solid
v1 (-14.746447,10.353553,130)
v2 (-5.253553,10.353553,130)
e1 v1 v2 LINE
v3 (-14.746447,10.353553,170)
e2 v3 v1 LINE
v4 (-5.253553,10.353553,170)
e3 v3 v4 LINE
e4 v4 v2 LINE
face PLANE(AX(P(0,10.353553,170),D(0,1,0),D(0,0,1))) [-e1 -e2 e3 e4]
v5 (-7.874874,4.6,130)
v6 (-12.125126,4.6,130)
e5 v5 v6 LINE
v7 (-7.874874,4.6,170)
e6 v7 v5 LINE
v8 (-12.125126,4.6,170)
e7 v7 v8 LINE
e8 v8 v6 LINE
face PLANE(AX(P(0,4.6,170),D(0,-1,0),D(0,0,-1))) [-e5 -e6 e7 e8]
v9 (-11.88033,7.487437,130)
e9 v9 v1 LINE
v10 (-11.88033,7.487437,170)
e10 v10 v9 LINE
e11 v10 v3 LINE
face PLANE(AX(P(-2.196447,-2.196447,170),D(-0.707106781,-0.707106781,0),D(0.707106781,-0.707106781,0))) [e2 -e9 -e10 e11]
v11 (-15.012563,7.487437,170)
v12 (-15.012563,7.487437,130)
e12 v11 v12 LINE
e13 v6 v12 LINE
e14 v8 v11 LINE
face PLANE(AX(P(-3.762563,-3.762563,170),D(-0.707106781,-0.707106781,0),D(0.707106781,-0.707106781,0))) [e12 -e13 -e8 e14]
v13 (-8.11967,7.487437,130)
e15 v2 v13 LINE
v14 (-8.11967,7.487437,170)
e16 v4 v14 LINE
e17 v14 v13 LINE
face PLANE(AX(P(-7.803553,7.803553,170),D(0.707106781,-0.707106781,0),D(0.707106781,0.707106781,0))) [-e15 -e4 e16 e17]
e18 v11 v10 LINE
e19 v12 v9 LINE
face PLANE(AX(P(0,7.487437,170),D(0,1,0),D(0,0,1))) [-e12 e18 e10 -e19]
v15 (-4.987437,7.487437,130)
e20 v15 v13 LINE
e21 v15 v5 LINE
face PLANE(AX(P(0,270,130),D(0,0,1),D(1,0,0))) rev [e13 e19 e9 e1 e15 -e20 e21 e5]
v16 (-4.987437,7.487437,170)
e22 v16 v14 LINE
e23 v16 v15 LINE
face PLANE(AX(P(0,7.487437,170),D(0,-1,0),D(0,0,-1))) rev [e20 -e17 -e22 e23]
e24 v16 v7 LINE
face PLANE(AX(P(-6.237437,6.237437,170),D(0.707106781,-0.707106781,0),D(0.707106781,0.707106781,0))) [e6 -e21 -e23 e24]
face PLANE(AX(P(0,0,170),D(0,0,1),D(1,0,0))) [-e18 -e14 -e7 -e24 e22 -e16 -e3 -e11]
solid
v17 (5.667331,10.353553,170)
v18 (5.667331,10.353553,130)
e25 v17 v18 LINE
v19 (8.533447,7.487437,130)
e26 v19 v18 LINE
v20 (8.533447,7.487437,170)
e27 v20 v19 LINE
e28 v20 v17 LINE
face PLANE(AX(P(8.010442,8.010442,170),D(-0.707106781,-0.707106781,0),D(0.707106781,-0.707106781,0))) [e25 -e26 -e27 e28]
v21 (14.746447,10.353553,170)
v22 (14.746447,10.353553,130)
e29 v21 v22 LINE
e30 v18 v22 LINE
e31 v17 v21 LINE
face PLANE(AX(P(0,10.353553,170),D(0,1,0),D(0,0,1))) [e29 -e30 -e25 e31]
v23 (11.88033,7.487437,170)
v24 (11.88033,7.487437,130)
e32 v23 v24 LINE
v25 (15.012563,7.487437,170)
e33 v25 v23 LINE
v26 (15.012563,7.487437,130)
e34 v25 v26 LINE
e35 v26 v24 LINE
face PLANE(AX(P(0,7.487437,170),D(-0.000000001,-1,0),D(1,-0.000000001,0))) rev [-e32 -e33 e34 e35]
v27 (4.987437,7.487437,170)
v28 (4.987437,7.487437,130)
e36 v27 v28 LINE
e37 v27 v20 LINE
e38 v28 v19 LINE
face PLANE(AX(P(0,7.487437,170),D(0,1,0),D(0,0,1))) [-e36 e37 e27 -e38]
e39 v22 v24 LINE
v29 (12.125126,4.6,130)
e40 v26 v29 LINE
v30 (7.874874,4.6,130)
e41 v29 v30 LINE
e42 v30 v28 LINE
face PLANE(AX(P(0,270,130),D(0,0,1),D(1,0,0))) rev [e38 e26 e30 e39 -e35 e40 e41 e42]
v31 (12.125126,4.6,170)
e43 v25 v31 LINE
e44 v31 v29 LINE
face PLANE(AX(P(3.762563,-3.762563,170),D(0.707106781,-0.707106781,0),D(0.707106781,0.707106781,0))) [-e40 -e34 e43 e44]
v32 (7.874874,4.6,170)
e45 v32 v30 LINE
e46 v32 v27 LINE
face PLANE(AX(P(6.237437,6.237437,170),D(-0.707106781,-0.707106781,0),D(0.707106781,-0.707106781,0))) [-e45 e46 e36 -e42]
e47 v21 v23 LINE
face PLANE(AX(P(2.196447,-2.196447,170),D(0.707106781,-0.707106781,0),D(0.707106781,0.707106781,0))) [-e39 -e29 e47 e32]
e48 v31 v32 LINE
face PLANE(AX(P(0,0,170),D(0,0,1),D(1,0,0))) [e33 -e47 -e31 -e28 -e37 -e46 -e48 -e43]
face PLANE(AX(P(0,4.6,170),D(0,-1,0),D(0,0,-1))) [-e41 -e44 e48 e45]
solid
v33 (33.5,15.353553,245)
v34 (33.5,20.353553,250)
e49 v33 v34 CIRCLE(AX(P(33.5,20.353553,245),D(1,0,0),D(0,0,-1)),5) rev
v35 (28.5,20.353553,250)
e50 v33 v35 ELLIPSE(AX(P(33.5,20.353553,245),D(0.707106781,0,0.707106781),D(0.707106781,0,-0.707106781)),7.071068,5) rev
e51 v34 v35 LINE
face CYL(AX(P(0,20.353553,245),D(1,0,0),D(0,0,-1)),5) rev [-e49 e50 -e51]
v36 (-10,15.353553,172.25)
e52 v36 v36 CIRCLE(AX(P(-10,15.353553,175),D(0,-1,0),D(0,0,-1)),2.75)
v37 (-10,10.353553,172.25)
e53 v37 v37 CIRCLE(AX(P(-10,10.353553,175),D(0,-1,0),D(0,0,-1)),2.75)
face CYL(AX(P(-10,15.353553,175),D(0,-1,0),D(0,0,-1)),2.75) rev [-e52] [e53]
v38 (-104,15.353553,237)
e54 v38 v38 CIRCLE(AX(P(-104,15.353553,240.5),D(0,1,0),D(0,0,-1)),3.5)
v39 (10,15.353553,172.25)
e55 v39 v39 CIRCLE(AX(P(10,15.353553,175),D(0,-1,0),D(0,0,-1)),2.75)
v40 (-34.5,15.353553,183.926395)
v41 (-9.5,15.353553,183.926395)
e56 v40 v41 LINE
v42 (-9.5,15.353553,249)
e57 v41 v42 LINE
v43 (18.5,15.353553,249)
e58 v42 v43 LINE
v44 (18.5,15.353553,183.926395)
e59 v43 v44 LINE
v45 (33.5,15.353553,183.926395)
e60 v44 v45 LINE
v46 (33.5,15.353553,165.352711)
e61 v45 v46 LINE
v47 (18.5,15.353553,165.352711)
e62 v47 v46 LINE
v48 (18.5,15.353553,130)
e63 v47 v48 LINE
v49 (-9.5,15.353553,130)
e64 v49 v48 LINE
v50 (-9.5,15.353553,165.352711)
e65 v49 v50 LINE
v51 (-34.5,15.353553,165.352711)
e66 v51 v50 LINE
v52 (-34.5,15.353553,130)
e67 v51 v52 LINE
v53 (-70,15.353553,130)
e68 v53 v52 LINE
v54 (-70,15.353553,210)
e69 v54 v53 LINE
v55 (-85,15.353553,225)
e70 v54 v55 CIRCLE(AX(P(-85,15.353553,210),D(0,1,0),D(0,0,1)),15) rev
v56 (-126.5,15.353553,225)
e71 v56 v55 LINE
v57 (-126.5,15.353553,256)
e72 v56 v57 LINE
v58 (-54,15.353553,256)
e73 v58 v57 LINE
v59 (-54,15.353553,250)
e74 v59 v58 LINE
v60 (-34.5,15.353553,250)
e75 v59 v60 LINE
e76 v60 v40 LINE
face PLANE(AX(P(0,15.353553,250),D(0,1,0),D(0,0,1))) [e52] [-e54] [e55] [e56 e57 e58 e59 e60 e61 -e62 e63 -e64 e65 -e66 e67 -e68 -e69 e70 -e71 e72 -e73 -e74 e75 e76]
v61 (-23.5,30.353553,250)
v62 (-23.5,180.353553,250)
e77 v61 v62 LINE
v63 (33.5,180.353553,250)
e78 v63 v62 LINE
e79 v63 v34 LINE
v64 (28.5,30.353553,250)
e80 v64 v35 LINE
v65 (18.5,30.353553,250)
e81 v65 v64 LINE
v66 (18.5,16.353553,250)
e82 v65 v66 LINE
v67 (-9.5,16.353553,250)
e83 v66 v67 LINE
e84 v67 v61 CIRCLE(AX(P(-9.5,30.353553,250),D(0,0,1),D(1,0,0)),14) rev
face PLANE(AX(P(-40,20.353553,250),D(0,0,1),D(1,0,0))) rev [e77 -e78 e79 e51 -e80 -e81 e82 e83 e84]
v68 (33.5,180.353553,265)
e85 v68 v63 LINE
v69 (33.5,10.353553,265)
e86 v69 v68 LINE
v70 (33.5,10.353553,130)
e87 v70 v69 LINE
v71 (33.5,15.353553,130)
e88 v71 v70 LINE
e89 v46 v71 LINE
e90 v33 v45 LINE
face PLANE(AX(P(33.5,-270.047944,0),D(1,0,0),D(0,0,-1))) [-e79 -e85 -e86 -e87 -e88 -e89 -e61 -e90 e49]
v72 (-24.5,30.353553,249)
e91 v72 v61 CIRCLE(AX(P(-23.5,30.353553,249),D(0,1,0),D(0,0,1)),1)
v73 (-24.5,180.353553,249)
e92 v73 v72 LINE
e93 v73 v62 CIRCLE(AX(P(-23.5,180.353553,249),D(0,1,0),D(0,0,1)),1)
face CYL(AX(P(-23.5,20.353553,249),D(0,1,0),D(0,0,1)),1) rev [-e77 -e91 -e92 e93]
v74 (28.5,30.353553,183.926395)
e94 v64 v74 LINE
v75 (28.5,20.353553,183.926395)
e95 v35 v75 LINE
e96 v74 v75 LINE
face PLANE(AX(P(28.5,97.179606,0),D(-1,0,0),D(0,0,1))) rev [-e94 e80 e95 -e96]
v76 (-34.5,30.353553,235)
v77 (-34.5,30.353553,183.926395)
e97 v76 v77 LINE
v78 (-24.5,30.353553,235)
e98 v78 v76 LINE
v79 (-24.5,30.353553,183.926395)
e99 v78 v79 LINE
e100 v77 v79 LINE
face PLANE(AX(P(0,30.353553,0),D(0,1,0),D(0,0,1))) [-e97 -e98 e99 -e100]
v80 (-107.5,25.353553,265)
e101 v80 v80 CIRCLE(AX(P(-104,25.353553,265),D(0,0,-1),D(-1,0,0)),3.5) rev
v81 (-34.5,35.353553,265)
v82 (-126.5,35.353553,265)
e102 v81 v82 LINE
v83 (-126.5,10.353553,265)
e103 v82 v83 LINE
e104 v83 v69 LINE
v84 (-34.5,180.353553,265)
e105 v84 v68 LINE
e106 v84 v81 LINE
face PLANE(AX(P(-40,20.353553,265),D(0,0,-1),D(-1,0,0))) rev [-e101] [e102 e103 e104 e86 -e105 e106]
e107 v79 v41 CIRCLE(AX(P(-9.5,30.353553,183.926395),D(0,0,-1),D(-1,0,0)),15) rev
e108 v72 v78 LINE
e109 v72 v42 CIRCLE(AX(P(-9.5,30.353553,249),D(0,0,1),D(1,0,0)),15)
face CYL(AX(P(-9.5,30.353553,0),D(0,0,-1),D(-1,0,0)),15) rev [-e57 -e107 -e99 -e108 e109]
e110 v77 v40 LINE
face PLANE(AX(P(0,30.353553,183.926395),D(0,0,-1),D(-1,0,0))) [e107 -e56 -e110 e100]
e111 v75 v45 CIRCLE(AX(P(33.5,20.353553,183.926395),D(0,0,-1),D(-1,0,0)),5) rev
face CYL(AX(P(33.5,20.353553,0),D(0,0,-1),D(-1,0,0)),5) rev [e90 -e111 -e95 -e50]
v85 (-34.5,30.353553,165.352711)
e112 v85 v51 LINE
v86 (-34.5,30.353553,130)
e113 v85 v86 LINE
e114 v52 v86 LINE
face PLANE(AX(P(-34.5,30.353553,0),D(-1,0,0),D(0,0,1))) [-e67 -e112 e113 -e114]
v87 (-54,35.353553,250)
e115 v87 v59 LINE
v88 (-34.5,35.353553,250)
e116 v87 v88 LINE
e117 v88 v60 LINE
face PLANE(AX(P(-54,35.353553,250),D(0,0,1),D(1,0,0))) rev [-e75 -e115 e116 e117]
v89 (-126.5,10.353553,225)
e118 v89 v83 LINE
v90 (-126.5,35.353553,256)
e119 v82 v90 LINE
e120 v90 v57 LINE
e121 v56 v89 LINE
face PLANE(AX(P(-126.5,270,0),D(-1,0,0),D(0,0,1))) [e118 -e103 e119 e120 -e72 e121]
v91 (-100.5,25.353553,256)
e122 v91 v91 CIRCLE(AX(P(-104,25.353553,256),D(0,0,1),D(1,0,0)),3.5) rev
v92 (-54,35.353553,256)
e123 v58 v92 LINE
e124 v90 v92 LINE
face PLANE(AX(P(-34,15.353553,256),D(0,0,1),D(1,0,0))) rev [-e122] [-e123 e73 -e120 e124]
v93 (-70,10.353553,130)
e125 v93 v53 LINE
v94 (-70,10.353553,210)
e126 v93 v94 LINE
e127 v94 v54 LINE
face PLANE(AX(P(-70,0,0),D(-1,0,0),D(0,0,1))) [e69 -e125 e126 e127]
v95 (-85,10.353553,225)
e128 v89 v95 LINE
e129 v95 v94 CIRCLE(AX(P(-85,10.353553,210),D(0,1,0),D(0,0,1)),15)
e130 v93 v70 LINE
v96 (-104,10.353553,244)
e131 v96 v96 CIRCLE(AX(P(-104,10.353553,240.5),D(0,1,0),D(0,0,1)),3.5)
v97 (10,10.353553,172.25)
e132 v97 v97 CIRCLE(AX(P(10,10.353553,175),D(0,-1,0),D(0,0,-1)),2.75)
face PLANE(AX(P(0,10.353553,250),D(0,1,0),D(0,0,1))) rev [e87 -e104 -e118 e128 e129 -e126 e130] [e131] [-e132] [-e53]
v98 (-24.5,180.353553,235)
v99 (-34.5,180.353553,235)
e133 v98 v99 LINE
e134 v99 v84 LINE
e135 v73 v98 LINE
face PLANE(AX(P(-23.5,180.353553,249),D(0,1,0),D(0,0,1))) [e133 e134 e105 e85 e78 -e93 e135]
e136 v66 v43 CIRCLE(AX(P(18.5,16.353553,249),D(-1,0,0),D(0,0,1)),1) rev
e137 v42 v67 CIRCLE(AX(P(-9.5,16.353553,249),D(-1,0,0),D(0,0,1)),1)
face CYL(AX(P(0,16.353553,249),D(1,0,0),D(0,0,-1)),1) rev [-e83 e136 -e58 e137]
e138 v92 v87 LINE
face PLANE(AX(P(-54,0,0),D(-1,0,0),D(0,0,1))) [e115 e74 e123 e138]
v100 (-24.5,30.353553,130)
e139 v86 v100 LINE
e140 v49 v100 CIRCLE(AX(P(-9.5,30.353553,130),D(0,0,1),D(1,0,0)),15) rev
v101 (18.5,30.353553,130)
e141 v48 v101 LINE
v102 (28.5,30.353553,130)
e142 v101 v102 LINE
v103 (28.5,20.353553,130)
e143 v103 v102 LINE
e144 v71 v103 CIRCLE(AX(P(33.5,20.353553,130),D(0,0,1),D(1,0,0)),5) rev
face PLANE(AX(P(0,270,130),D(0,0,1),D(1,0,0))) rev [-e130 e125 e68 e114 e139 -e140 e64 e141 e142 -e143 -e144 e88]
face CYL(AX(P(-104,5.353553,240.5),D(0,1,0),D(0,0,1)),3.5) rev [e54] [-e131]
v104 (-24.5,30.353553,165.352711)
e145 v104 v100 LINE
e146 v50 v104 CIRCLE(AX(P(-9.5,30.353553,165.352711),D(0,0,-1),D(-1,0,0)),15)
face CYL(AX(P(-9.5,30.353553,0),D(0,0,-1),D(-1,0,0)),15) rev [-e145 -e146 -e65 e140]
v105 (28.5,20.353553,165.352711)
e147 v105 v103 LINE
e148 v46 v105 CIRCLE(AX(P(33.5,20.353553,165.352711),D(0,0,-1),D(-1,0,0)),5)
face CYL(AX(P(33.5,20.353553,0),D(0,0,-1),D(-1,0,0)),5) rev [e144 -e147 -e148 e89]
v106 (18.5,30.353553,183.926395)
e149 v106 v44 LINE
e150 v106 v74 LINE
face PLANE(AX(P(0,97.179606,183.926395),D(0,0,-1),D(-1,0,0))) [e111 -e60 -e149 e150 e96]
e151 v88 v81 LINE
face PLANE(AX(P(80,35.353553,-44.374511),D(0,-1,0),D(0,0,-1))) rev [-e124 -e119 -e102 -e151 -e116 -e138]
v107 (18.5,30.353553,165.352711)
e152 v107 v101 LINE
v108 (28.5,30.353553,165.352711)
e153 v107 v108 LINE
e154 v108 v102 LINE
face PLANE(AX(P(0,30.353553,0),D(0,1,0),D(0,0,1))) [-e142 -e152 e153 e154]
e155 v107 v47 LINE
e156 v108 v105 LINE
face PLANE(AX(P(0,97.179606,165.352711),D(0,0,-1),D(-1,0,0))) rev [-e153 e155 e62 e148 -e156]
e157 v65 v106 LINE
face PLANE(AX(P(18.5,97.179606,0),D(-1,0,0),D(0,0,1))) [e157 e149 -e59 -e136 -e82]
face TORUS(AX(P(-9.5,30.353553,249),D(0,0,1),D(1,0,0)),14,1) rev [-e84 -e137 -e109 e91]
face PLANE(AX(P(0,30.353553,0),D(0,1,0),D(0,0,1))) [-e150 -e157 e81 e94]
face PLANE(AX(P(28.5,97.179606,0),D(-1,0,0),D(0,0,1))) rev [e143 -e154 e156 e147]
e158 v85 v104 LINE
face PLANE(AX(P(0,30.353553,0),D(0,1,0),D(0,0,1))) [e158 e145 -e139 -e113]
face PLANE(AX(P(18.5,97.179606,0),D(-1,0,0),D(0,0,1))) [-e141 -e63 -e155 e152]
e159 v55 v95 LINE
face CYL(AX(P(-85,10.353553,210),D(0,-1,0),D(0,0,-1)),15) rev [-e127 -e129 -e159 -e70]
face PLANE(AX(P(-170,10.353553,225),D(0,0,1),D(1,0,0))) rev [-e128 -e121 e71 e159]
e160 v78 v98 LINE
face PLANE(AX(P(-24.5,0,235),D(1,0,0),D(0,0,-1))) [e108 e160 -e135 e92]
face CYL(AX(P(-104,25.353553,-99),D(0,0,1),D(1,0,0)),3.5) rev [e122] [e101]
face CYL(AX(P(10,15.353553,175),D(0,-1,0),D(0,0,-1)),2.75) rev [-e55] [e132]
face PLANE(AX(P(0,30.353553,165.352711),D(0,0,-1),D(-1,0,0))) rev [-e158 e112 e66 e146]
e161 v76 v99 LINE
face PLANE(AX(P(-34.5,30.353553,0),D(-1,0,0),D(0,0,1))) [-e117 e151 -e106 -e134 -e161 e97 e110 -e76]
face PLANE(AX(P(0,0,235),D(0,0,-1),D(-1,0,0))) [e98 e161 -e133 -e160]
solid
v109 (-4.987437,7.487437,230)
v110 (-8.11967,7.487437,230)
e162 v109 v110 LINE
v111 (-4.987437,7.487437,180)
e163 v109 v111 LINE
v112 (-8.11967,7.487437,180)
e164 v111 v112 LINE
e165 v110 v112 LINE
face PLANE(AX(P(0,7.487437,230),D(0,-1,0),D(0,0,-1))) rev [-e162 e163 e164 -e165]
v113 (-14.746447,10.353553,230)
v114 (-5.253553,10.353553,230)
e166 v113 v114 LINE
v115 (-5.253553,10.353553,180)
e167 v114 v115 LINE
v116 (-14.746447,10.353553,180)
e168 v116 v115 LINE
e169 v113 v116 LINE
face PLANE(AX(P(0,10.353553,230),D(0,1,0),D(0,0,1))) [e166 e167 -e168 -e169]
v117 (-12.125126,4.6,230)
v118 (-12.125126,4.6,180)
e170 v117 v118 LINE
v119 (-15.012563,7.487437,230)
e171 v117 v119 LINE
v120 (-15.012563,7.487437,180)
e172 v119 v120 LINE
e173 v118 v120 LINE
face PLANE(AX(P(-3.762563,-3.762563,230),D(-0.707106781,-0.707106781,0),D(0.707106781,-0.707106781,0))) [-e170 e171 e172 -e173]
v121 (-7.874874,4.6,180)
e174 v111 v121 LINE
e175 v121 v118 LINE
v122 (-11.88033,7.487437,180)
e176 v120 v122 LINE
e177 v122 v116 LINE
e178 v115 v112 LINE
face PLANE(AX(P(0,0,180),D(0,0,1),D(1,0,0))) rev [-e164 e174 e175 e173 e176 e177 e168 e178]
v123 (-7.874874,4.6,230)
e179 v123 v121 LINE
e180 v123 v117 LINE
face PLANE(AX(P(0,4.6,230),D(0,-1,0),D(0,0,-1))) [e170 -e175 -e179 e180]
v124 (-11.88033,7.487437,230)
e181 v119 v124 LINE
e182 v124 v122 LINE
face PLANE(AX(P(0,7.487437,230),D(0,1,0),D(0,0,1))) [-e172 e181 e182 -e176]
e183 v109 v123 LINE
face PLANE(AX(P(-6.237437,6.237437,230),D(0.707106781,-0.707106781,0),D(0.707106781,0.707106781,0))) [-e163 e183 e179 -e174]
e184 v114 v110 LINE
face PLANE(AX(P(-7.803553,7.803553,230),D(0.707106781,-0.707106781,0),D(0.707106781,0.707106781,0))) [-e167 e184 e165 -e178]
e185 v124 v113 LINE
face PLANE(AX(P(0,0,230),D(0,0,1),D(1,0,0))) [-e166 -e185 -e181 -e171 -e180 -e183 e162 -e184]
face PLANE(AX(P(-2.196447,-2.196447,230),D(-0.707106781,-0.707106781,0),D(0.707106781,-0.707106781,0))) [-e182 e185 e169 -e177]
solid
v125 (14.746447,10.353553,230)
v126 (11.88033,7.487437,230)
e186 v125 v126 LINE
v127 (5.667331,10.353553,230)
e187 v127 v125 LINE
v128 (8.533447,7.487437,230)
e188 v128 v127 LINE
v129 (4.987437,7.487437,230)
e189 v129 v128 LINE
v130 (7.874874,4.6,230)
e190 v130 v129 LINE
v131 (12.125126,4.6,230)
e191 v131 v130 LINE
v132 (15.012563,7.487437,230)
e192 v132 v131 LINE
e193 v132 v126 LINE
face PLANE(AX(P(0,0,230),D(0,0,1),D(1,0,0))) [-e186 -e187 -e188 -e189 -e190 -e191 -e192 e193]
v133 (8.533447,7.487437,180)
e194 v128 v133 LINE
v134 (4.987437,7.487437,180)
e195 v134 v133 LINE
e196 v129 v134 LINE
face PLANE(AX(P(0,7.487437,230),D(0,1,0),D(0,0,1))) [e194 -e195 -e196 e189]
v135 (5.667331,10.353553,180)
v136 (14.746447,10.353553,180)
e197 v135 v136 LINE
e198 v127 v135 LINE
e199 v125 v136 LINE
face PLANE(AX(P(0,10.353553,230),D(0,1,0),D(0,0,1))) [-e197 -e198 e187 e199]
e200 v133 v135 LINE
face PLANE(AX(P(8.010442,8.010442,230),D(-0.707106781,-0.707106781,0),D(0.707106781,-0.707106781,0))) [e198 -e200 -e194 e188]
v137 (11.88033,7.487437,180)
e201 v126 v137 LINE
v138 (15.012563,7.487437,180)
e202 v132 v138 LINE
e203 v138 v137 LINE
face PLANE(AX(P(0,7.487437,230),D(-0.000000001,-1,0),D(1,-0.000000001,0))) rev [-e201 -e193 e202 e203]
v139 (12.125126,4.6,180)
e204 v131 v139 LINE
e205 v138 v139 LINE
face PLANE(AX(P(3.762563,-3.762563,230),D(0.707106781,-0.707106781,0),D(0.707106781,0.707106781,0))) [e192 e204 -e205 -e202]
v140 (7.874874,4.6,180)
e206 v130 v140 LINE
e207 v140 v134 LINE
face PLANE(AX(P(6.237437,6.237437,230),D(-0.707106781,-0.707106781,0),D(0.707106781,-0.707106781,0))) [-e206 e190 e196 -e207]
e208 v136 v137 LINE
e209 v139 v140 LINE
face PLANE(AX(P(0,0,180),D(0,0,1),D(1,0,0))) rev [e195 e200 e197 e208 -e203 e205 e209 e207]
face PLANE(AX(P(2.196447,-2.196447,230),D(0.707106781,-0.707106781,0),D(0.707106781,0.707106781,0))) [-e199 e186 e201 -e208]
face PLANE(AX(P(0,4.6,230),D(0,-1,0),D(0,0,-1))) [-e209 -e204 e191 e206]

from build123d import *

# Parameters (mm, degrees)
BOSS_EXTRUDE1_DEPTH      = 250
BOSS_EXTRUDE2_DEPTH      = 50
BOSS_EXTRUDE2_2_DEPTH    = 50
LPATTERN1_COUNT          = 4
LPATTERN1_PITCH          = 60
SKETCH2_R                = 2.75
CUT_EXTRUDE1_DEPTH       = 251.864711302
UPPER_ACRYLIC_SUPP_W     = 20
UPPER_ACRYLIC_SUPP_H     = 250
BOSS_EXTRUDE3_DEPTH      = 5
UPPER_ACRYLIC_SUPP_3_W   = 10
UPPER_ACRYLIC_SUPP_3_H   = 66.073604859
UPPER_ACRYLIC_SUPP_3_H_2 = 41.475217291
UPPER_ACRYLIC_SUPP_3_H_3 = 42.557179481
UPPER_ACRYLIC_SUPP_3_H_4 = 45.558340935
BOSS_EXTRUDE4_DEPTH      = 15
FILLET1_R                = 15
SKETCH4_W                = 60
SKETCH4_H                = 15
BOSS_EXTRUDE5_DEPTH      = 5
SKETCH4_3_W              = 60
SKETCH4_3_H              = 15
BOSS_EXTRUDE6_DEPTH      = 60
SKETCH5_W                = 10
SKETCH5_H                = 45
BOSS_EXTRUDE7_DEPTH      = 15
BOSS_EXTRUDE8_START      = 250
SKETCH5_3_W              = 10
SKETCH5_3_H              = 45
BOSS_EXTRUDE8_DEPTH      = 15
FILLET2_R                = 1
SKETCH6_W                = 6
SKETCH6_H                = 60
CUT_EXTRUDE2_DEPTH       = 6
BOSS_EXTRUDE9_DEPTH      = 30
SKETCH8_W                = 333.602701612
SKETCH8_H                = 59.031331047
CUT_EXTRUDE3_DEPTH       = 150
SKETCH9_W                = 6
SKETCH9_H                = 20
CLOTH_ESCAPE_GAP_DEPTH   = 20
SKETCH11_W               = 9
SKETCH11_H               = 20
BOSS_EXTRUDE11_DEPTH     = 100
CUT_EXTRUDE4_DEPTH       = 68
SKETCH13_W               = 40
SKETCH13_H               = 5
BOSS_EXTRUDE13_DEPTH     = 100
CUT_EXTRUDE5_DEPTH       = 100
FILLET3_R                = 15
BOSS_EXTRUDE14_START     = -5
BOSS_EXTRUDE14_DEPTH     = 25
CUT_EXTRUDE6_DEPTH       = 30
CUT_EXTRUDE6_DEPTH_BACK  = 10
SKETCH16_5_W             = 8.5
SKETCH16_5_H             = 41.475217291
SKETCH16_5_H_2           = 42.557179481
SKETCH16_5_W_2           = 1.5
SKETCH16_5_H_3           = 42.177819043
SKETCH16_5_H_4           = 20.831100018
SKETCH16_5_H_5           = 17.311395043
SKETCH16_5_H_6           = 18.573684265
SKETCH16_5_H_7           = 65.073604859
SKETCH16_6_W             = 8.5
SKETCH16_6_H             = 41.475217291
SKETCH16_6_H_2           = 42.557179481
SKETCH16_6_W_2           = 1.5
SKETCH16_6_H_3           = 42.177819043
SKETCH16_6_H_4           = 20.831100018
SKETCH16_6_H_5           = 17.311395043
SKETCH16_6_H_6           = 18.573684265
SKETCH16_6_H_7           = 65.073604859
BOSS_EXTRUDE15_DEPTH     = 5
BOSS_EXTRUDE16_DEPTH     = 20
SKETCH16_8_W             = 8.5
SKETCH16_8_H             = 41.475217291
SKETCH16_8_H_2           = 42.557179481
SKETCH16_8_W_2           = 1.5
SKETCH16_8_H_3           = 42.177819043
SKETCH16_8_H_4           = 65.073604859
BOSS_EXTRUDE17_DEPTH     = 15
BOSS_EXTRUDE18_START     = -5
BOSS_EXTRUDE18_DEPTH     = 25
FILLET4_R                = 5
BOSS_EXTRUDE21_START     = 145
BOSS_EXTRUDE21_DEPTH     = 170
SKETCH19_R               = 3.5
CUT_EXTRUDE7_DEPTH       = 10
CUT_EXTRUDE8_DEPTH       = 355
CUT_EXTRUDE8_DEPTH_BACK  = 10
SKETCH20_R               = 3.5
SKETCH21_W               = 15
SKETCH21_H               = 197.501027769
CUT_EXTRUDE9_DEPTH       = 130
SKETCH22_W               = 160
SKETCH22_H               = 135
SKETCH22_H_2             = 10
CUT_EXTRUDE11_DEPTH      = 270


with BuildPart() as part:
    # profile → Boss-Extrude1 (new body)
    with BuildSketch(Plane.XY):
        Polygon((-14.746446609, 10.353553391), (-5.253553391, 10.353553391), (5.667330529, 10.353553391), (14.746446609, 10.353553391), (20, 10.353553391), (20, 15.353553391), (-20, 15.353553391), (-20, 10.353553391), align=None)
    extrude(amount=BOSS_EXTRUDE1_DEPTH)

    # Sketch2 → Cut-Extrude1 (cut, through all)
    with BuildSketch(Plane.XZ.offset(-10.353553391)):
        with Locations(Location((-10, 175, 0), (0, 0, 270))):
            Circle(SKETCH2_R)
        with Locations(Location((10, 175, 0), (0, 0, 270))):
            Circle(SKETCH2_R)
        with Locations(Location((-10, 115, 0), (0, 0, 270))):
            Circle(SKETCH2_R)
        with Locations(Location((10, 115, 0), (0, 0, 270))):
            Circle(SKETCH2_R)
        with Locations(Location((-10, 55, 0), (0, 0, 270))):
            Circle(SKETCH2_R)
        with Locations(Location((10, 55, 0), (0, 0, 270))):
            Circle(SKETCH2_R)
    extrude(amount=-CUT_EXTRUDE1_DEPTH, mode=Mode.SUBTRACT)

    # upper_acrylic_supp → Boss-Extrude3 (add)
    with BuildSketch(Plane(origin=(0, 15.353553391, 0), x_dir=(1, 0, 0), z_dir=(0, 1, 0))):
        with Locations((-30, -125)):
            Rectangle(UPPER_ACRYLIC_SUPP_W, UPPER_ACRYLIC_SUPP_H)
    extrude(amount=-BOSS_EXTRUDE3_DEPTH)

    # upper_acrylic_supp<3> → Boss-Extrude4 (add)
    with BuildSketch(Plane(origin=(0, 15.353553391, 0), x_dir=(1, 0, 0), z_dir=(0, 1, 0))):
        with Locations((-29.5, -216.963197571)):
            Rectangle(UPPER_ACRYLIC_SUPP_3_W, UPPER_ACRYLIC_SUPP_3_H)
        with Locations((-29.5, -144.615102231)):
            Rectangle(UPPER_ACRYLIC_SUPP_3_W, UPPER_ACRYLIC_SUPP_3_H_2)
        with Locations((-29.5, -85.287508801)):
            Rectangle(UPPER_ACRYLIC_SUPP_3_W, UPPER_ACRYLIC_SUPP_3_H_3)
        with Locations((-29.5, -22.779170468)):
            Rectangle(UPPER_ACRYLIC_SUPP_3_W, UPPER_ACRYLIC_SUPP_3_H_4)
    extrude(amount=BOSS_EXTRUDE4_DEPTH)

    # Fillet1
    fillet1_edges = [part.edges().sort_by_distance(p)[0] for p in [
        (-24.5, 15.353553391, 22.779170467),
        (-24.5, 15.353553391, 85.287508801),
        (-24.5, 15.353553391, 144.615102231),
        (-24.5, 15.353553391, 216.963197571),
    ]]
    fillet(fillet1_edges, radius=FILLET1_R - 0.0001)  # a hair under: the kernel refuses the full size



with BuildPart() as body_2:
    # Sketch1<3> → Boss-Extrude2 (new body)
    with BuildSketch(Plane.XY):
        Polygon((-7.253553391, 8.353553391), (-8.119669914, 7.487436867), (-5.5, 7.487436867), (-4.987436867, 7.487436867), (-5.5, 6.974873734), (-7.874873734, 4.6), (-12.125126266, 4.6), (-14.5, 6.974873734), (-15.012563133, 7.487436867), (-14.5, 7.487436867), (-11.880330086, 7.487436867), (-12.746446609, 8.353553391), (-14.746446609, 10.353553391), (-5.253553391, 10.353553391), align=None)
    boss_extrude2 = extrude(amount=BOSS_EXTRUDE2_DEPTH)


with BuildPart() as body_3:
    # Sketch1<3> → Boss-Extrude2 2 (new body)
    with BuildSketch(Plane.XY):
        Polygon((12.746446609, 8.353553391), (11.880330086, 7.487436867), (14.5, 7.487436867), (15.012563133, 7.487436867), (14.5, 6.974873734), (12.125126266, 4.6), (7.874873734, 4.6), (5.5, 6.974873734), (4.987436867, 7.487436867), (5.5, 7.487436867), (8.533447053, 7.487436867), (7.667330529, 8.353553391), (5.667330529, 10.353553391), (14.746446609, 10.353553391), align=None)
    boss_extrude2_2 = extrude(amount=BOSS_EXTRUDE2_2_DEPTH)


with BuildPart() as lpattern1_1:
    # LPattern1: pattern copy
    add(boss_extrude2.moved(Location(Vector(0, 0, 1) * (1 * LPATTERN1_PITCH))))


with BuildPart() as lpattern1_2:
    # LPattern1: pattern copy
    add(boss_extrude2.moved(Location(Vector(0, 0, 1) * (2 * LPATTERN1_PITCH))))


with BuildPart() as lpattern1_3:
    # LPattern1: pattern copy
    add(boss_extrude2.moved(Location(Vector(0, 0, 1) * (3 * LPATTERN1_PITCH))))


with BuildPart() as lpattern1_4:
    # LPattern1: pattern copy
    add(boss_extrude2_2.moved(Location(Vector(0, 0, 1) * (1 * LPATTERN1_PITCH))))


with BuildPart() as lpattern1_5:
    # LPattern1: pattern copy
    add(boss_extrude2_2.moved(Location(Vector(0, 0, 1) * (2 * LPATTERN1_PITCH))))


with BuildPart() as lpattern1_6:
    # LPattern1: pattern copy
    add(boss_extrude2_2.moved(Location(Vector(0, 0, 1) * (3 * LPATTERN1_PITCH))))


with BuildPart() as part_1:
    add(part.part)

    add(body_2.part)  # Boss-Extrude5 merges body 2

    add(body_3.part)  # Boss-Extrude5 merges body 3
    # Sketch4 → Boss-Extrude5 (add, symmetric)
    with BuildSketch(Plane(origin=(0, 15.353553391, 0), x_dir=(1, 0, 0), z_dir=(0, 1, 0))):
        with Locations((-10, -257.5)):
            Rectangle(SKETCH4_W, SKETCH4_H)
        with Locations((-10, 7.5)):
            Rectangle(SKETCH4_W, SKETCH4_H)
    extrude(amount=BOSS_EXTRUDE5_DEPTH, both=True)

    # Sketch4<3> → Boss-Extrude6 (add)
    with BuildSketch(Plane(origin=(0, 15.353553391, 0), x_dir=(1, 0, 0), z_dir=(0, 1, 0))):
        with Locations((-10, -257.5)):
            Rectangle(SKETCH4_3_W, SKETCH4_3_H)
        with Locations((-10, 7.5)):
            Rectangle(SKETCH4_3_W, SKETCH4_3_H)
    extrude(amount=BOSS_EXTRUDE6_DEPTH)

    # Sketch5 → Boss-Extrude7 (add)
    with BuildSketch(Plane(origin=(0, 0, 250), x_dir=(-1, 0, 0), z_dir=(0, 0, -1))):
        with Locations((29.5, 52.853553391)):
            Rectangle(SKETCH5_W, SKETCH5_H)
    extrude(amount=BOSS_EXTRUDE7_DEPTH)

    # Sketch5<3> → Boss-Extrude8 (add)
    with BuildSketch(Plane(origin=(0, 0, 250), x_dir=(-1, 0, 0), z_dir=(0, 0, -1)).offset(BOSS_EXTRUDE8_START)):
        with Locations((29.5, 52.853553391)):
            Rectangle(SKETCH5_3_W, SKETCH5_3_H)
    extrude(amount=-BOSS_EXTRUDE8_DEPTH)

    # Fillet2
    fillet2_edges = [part_1.edges().sort_by_distance(p)[0] for p in [
        (-24.5, 52.853503391, 250),
        (-24.5, 52.853503391, 0),
        (5.24995, 15.353553391, 250),
        (-20.106631007, 19.746922384, 250),
        (-20.106631007, 19.746922384, 0),
        (5.24995, 15.353553391, 0),
    ]]
    fillet(fillet2_edges, radius=FILLET2_R)

    # Sketch6 → Cut-Extrude2 (cut)
    with BuildSketch(Plane.ZY.offset(40)):
        with Locations((253, 45.353553391)):
            Rectangle(SKETCH6_W, SKETCH6_H)
        with Locations((-3, 45.353553391)):
            Rectangle(SKETCH6_W, SKETCH6_H)
    extrude(amount=-CUT_EXTRUDE2_DEPTH, mode=Mode.SUBTRACT)

    # Sketch7 → Boss-Extrude9 (add)
    with BuildSketch(Plane.ZY.offset(40)):
        Polygon((265, 75.353553391), (256, 75.353553391), (256, 15.353553391), (-6, 15.353553391), (-6, 75.353553391), (-15, 75.353553391), (-15, 10.353553391), (265, 10.353553391), align=None)
    extrude(amount=BOSS_EXTRUDE9_DEPTH)

    # Sketch8 → Cut-Extrude3 (cut)
    with BuildSketch(Plane.ZY.offset(70)):
        with Locations((122.426839416, 64.869218915)):
            Rectangle(SKETCH8_W, SKETCH8_H)
    extrude(amount=-CUT_EXTRUDE3_DEPTH, mode=Mode.SUBTRACT)

    # Sketch9 → cloth_escape_gap (add)
    with BuildSketch(Plane.ZY.offset(34)):
        with Locations((253, 25.353553391)):
            Rectangle(SKETCH9_W, SKETCH9_H)
        with Locations((-3, 25.353553391)):
            Rectangle(SKETCH9_W, SKETCH9_H)
    extrude(amount=CLOTH_ESCAPE_GAP_DEPTH)

    # Sketch11 → Boss-Extrude11 (add)
    with BuildSketch(Plane.ZY.offset(70)):
        with Locations((-10.5, 25.353553391)):
            Rectangle(SKETCH11_W, SKETCH11_H)
        with Locations((260.5, 25.353553391)):
            Rectangle(SKETCH11_W, SKETCH11_H)
    extrude(amount=BOSS_EXTRUDE11_DEPTH)

    # Sketch12 → Cut-Extrude4 (cut)
    with BuildSketch(Plane.XZ.offset(-10.353553391)):
        Polygon((-170, 265), (-70, 265), (-170, 260.5), align=None)
        Polygon((-70, -15), (-170, -10.5), (-170, -15), align=None)
    extrude(amount=-CUT_EXTRUDE4_DEPTH, mode=Mode.SUBTRACT)

    # Sketch13 → Boss-Extrude13 (add)
    with BuildSketch(Plane.ZY.offset(70)):
        with Locations((5, 12.853553391)):
            Rectangle(SKETCH13_W, SKETCH13_H)
        with Locations((245, 12.853553391)):
            Rectangle(SKETCH13_W, SKETCH13_H)
    extrude(amount=BOSS_EXTRUDE13_DEPTH)

    # Sketch14 → Cut-Extrude5 (cut)
    with BuildSketch(Plane(origin=(0, 15.353553391, 0), x_dir=(1, 0, 0), z_dir=(0, 1, 0))):
        Polygon((-70, -265), (-170, -260.5), (-170, -265), align=None)
        Polygon((-170, 15), (-170, 10.5), (-70, 15), align=None)
    extrude(amount=-CUT_EXTRUDE5_DEPTH, mode=Mode.SUBTRACT)

    # Fillet3
    fillet3_edges = [part_1.edges().sort_by_distance(p)[0] for p in [
        (-70, 12.853553391, 25),
        (-70, 12.853553391, 225),
    ]]
    fillet(fillet3_edges, radius=FILLET3_R)

    # Sketch16 → Boss-Extrude14 (add)
    with BuildSketch(Plane(origin=(0, 15.353553391, 0), x_dir=(1, 0, 0), z_dir=(0, 1, 0)).offset(BOSS_EXTRUDE14_START)):
        Polygon((28.5, 0), (33.5, 0), (33.5, 15), (18.5, 15), (18.5, 0), align=None)
        Polygon((18.5, -250), (18.5, -265), (33.5, -265), (33.5, -250), (28.5, -250), align=None)
    extrude(amount=BOSS_EXTRUDE14_DEPTH)

    # Sketch16<5> → Cut-Extrude6 (cut, two sides: drawn at the far end of the back side and taken through both)
    with BuildSketch(Plane(origin=(0, 15.353553391, 0), x_dir=(1, 0, 0), z_dir=(0, 1, 0)).offset(-CUT_EXTRUDE6_DEPTH_BACK)):
        Polygon((18.5, -250), (18.5, -265), (33.5, -265), (33.5, -250), (28.5, -250), align=None)
        Polygon((28.5, -250), (33.5, -250), (33.5, 0), (28.5, 0), (28.5, -43.177819043), (20, -43.177819043), (20, -64.008919061), (28.5, -64.008919061), (28.5, -106.566098542), (20, -106.566098542), (20, -123.877493585), (28.5, -123.877493585), (28.5, -165.352710876), (20, -165.352710876), (20, -183.926395141), (28.5, -183.926395141), align=None)
        with Locations((24.25, -144.615102231)):
            Rectangle(SKETCH16_5_W, SKETCH16_5_H)
        with Locations((24.25, -85.287508801)):
            Rectangle(SKETCH16_5_W, SKETCH16_5_H_2)
        Polygon((28.5, -43.177819043), (28.5, 0), (18.5, 0), (18.5, -1), (20, -1), (20, -43.177819043), align=None)
        Polygon((28.5, 0), (33.5, 0), (33.5, 15), (18.5, 15), (18.5, 0), align=None)
        with Locations((19.25, -22.088909521)):
            Rectangle(SKETCH16_5_W_2, SKETCH16_5_H_3)
        with Locations((19.25, -53.593369052)):
            Rectangle(SKETCH16_5_W_2, SKETCH16_5_H_4)
        with Locations((19.25, -85.287508801)):
            Rectangle(SKETCH16_5_W_2, SKETCH16_5_H_2)
        with Locations((19.25, -115.221796064)):
            Rectangle(SKETCH16_5_W_2, SKETCH16_5_H_5)
        with Locations((19.25, -144.615102231)):
            Rectangle(SKETCH16_5_W_2, SKETCH16_5_H)
        with Locations((19.25, -174.639553009)):
            Rectangle(SKETCH16_5_W_2, SKETCH16_5_H_6)
        with Locations((19.25, -216.463197571)):
            Rectangle(SKETCH16_5_W_2, SKETCH16_5_H_7)
        Polygon((18.5, -249), (18.5, -250), (28.5, -250), (28.5, -183.926395141), (20, -183.926395141), (20, -249), align=None)
    extrude(amount=CUT_EXTRUDE6_DEPTH + CUT_EXTRUDE6_DEPTH_BACK, mode=Mode.SUBTRACT)

    # Sketch16<6> → Boss-Extrude15 (add)
    with BuildSketch(Plane(origin=(0, 15.353553391, 0), x_dir=(1, 0, 0), z_dir=(0, 1, 0))):
        Polygon((28.5, -250), (33.5, -250), (33.5, 0), (28.5, 0), (28.5, -43.177819043), (20, -43.177819043), (20, -64.008919061), (28.5, -64.008919061), (28.5, -106.566098542), (20, -106.566098542), (20, -123.877493585), (28.5, -123.877493585), (28.5, -165.352710876), (20, -165.352710876), (20, -183.926395141), (28.5, -183.926395141), align=None)
        Polygon((18.5, -249), (18.5, -250), (28.5, -250), (28.5, -183.926395141), (20, -183.926395141), (20, -249), align=None)
        Polygon((18.5, -250), (18.5, -265), (33.5, -265), (33.5, -250), (28.5, -250), align=None)
        with Locations((24.25, -144.615102231)):
            Rectangle(SKETCH16_6_W, SKETCH16_6_H)
        with Locations((24.25, -85.287508801)):
            Rectangle(SKETCH16_6_W, SKETCH16_6_H_2)
        Polygon((28.5, -43.177819043), (28.5, 0), (18.5, 0), (18.5, -1), (20, -1), (20, -43.177819043), align=None)
        Polygon((28.5, 0), (33.5, 0), (33.5, 15), (18.5, 15), (18.5, 0), align=None)
        with Locations((19.25, -22.088909521)):
            Rectangle(SKETCH16_6_W_2, SKETCH16_6_H_3)
        with Locations((19.25, -53.593369052)):
            Rectangle(SKETCH16_6_W_2, SKETCH16_6_H_4)
        with Locations((19.25, -85.287508801)):
            Rectangle(SKETCH16_6_W_2, SKETCH16_6_H_2)
        with Locations((19.25, -115.221796064)):
            Rectangle(SKETCH16_6_W_2, SKETCH16_6_H_5)
        with Locations((19.25, -144.615102231)):
            Rectangle(SKETCH16_6_W_2, SKETCH16_6_H)
        with Locations((19.25, -174.639553009)):
            Rectangle(SKETCH16_6_W_2, SKETCH16_6_H_6)
        with Locations((19.25, -216.463197571)):
            Rectangle(SKETCH16_6_W_2, SKETCH16_6_H_7)
    extrude(amount=-BOSS_EXTRUDE15_DEPTH)

    # Sketch16<7> → Boss-Extrude16 (add)
    with BuildSketch(Plane(origin=(0, 15.353553391, 0), x_dir=(1, 0, 0), z_dir=(0, 1, 0))):
        Polygon((18.5, -250), (18.5, -265), (33.5, -265), (33.5, -250), (28.5, -250), align=None)
        Polygon((28.5, 0), (33.5, 0), (33.5, 15), (18.5, 15), (18.5, 0), align=None)
    extrude(amount=BOSS_EXTRUDE16_DEPTH)

    # Sketch16<8> → Boss-Extrude17 (add)
    with BuildSketch(Plane(origin=(0, 15.353553391, 0), x_dir=(1, 0, 0), z_dir=(0, 1, 0))):
        Polygon((18.5, -249), (18.5, -250), (28.5, -250), (28.5, -183.926395141), (20, -183.926395141), (20, -249), align=None)
        with Locations((24.25, -144.615102231)):
            Rectangle(SKETCH16_8_W, SKETCH16_8_H)
        with Locations((24.25, -85.287508801)):
            Rectangle(SKETCH16_8_W, SKETCH16_8_H_2)
        Polygon((28.5, -43.177819043), (28.5, 0), (18.5, 0), (18.5, -1), (20, -1), (20, -43.177819043), align=None)
        with Locations((19.25, -22.088909521)):
            Rectangle(SKETCH16_8_W_2, SKETCH16_8_H_3)
        with Locations((19.25, -85.287508801)):
            Rectangle(SKETCH16_8_W_2, SKETCH16_8_H_2)
        with Locations((19.25, -144.615102231)):
            Rectangle(SKETCH16_8_W_2, SKETCH16_8_H)
        with Locations((19.25, -216.463197571)):
            Rectangle(SKETCH16_8_W_2, SKETCH16_8_H_4)
    extrude(amount=BOSS_EXTRUDE17_DEPTH)

    # Sketch14<2> → Boss-Extrude18 (add)
    with BuildSketch(Plane(origin=(0, 15.353553391, 0), x_dir=(1, 0, 0), z_dir=(0, 1, 0)).offset(BOSS_EXTRUDE18_START)):
        Polygon((-70, -265), (-170, -260.5), (-170, -265), align=None)
        Polygon((-170, 15), (-170, 10.5), (-70, 15), align=None)
    extrude(amount=BOSS_EXTRUDE18_DEPTH)

    # Fillet4
    fillet4_edges = [part_1.edges().sort_by_distance(p)[0] for p in [
        (31, 15.353553391, 0),
        (28.5, 15.353553391, 21.588909521),
        (28.5, 15.353553391, 85.287508801),
        (28.5, 15.353553391, 144.615102231),
        (31, 15.353553391, 250),
        (28.5, 15.353553391, 216.963197571),
    ]]
    fillet(fillet4_edges, radius=FILLET4_R - 0.0001)  # a hair under: the kernel refuses the full size

    # Sketch18 → Boss-Extrude21 (add)
    with BuildSketch(Plane(origin=(0, 35.353553391, 0), x_dir=(1, 0, 0), z_dir=(0, 1, 0)).offset(BOSS_EXTRUDE21_START)):
        with BuildLine():
            Line((-34.5, -250), (-34.5, -265))
            Line((-34.5, -265), (33.5, -265))
            Line((33.5, -265), (33.5, -250))
            Line((33.5, -250), (-23.5, -250))
            ThreePointArc((-23.5, -250), (-24.207106781, -249.707106781), (-24.5, -249))
            Line((-24.5, -249), (-24.5, -235))
            Line((-24.5, -235), (-34.5, -235))
            Line((-34.5, -235), (-34.5, -250))
        make_face()
        with BuildLine():
            Line((-34.5, 15), (-34.5, 0))
            Line((-34.5, 0), (-34.5, -15))
            Line((-34.5, -15), (-24.5, -15))
            Line((-24.5, -15), (-24.5, -1))
            ThreePointArc((-24.5, -1), (-24.207106781, -0.292893219), (-23.5, 0))
            Line((-23.5, 0), (33.5, 0))
            Line((33.5, 0), (33.5, 15))
            Line((33.5, 15), (-34.5, 15))
        make_face()
    extrude(amount=-BOSS_EXTRUDE21_DEPTH)

    # Sketch19 → Cut-Extrude7 (cut)
    with BuildSketch(Plane(origin=(0, 15.353553391, 0), x_dir=(1, 0, 0), z_dir=(0, 1, 0))):
        with Locations(Location((-154, -9.5, 0), (0, 0, 270))):
            Circle(SKETCH19_R)
        with Locations(Location((-104, -9.5, 0), (0, 0, 270))):
            Circle(SKETCH19_R)
        with Locations(Location((-104, -240.5, 0), (0, 0, 270))):
            Circle(SKETCH19_R)
        with Locations(Location((-154, -240.5, 0), (0, 0, 270))):
            Circle(SKETCH19_R)
    extrude(amount=-CUT_EXTRUDE7_DEPTH, mode=Mode.SUBTRACT)

    # Sketch20 → Cut-Extrude8 (cut, two sides: drawn at the far end of the back side and taken through both)
    with BuildSketch(Plane(origin=(0, 0, 256), x_dir=(-1, 0, 0), z_dir=(0, 0, -1)).offset(-CUT_EXTRUDE8_DEPTH_BACK)):
        with Locations(Location((104, 25.353553391, 0), (0, 0, 180))):
            Circle(SKETCH20_R)
        with Locations(Location((154, 25.353553391, 0), (0, 0, 180))):
            Circle(SKETCH20_R)
    extrude(amount=CUT_EXTRUDE8_DEPTH + CUT_EXTRUDE8_DEPTH_BACK, mode=Mode.SUBTRACT)

    # Sketch21 → Cut-Extrude9 (cut)
    with BuildSketch(Plane.XY):
        with Locations((6, 114.104067276)):
            Rectangle(SKETCH21_W, SKETCH21_H)
    extrude(amount=-CUT_EXTRUDE9_DEPTH, mode=Mode.SUBTRACT)


with BuildPart() as cut_extrude11_tool:
    # Sketch22 → Cut-Extrude11 (new body)
    with BuildSketch(Plane(origin=(0, 0, 0), x_dir=(1, 0, 0), z_dir=(0, 1, 0))):
        with Locations((-46.5, -52.5)):
            Rectangle(SKETCH22_W, SKETCH22_H)
        with Locations((-46.5, -125)):
            Rectangle(SKETCH22_W, SKETCH22_H_2)
        Polygon((-126.5, 15), (-186.5, 15), (-186.5, -265), (-126.5, -265), (-126.5, -130), (-126.5, -120), align=None)
    extrude(amount=CUT_EXTRUDE11_DEPTH)


with BuildPart() as part_2:
    add(part_1.part)

    # Cut-Extrude11: cut by cut_extrude11_tool
    add(cut_extrude11_tool.part, mode=Mode.SUBTRACT)


with BuildPart() as lpattern1_1_1:
    add(lpattern1_1.part)

    # Cut-Extrude11: cut by cut_extrude11_tool
    add(cut_extrude11_tool.part, mode=Mode.SUBTRACT)


with BuildPart() as lpattern1_2_1:
    add(lpattern1_2.part)

    # Cut-Extrude11: cut by cut_extrude11_tool
    add(cut_extrude11_tool.part, mode=Mode.SUBTRACT)


with BuildPart() as lpattern1_4_1:
    add(lpattern1_4.part)

    # Cut-Extrude11: cut by cut_extrude11_tool
    add(cut_extrude11_tool.part, mode=Mode.SUBTRACT)


with BuildPart() as lpattern1_5_1:
    add(lpattern1_5.part)

    # Cut-Extrude11: cut by cut_extrude11_tool
    add(cut_extrude11_tool.part, mode=Mode.SUBTRACT)


solid = Compound([lpattern1_3.part, lpattern1_6.part, part_2.part, lpattern1_2_1.part, lpattern1_5_1.part])
